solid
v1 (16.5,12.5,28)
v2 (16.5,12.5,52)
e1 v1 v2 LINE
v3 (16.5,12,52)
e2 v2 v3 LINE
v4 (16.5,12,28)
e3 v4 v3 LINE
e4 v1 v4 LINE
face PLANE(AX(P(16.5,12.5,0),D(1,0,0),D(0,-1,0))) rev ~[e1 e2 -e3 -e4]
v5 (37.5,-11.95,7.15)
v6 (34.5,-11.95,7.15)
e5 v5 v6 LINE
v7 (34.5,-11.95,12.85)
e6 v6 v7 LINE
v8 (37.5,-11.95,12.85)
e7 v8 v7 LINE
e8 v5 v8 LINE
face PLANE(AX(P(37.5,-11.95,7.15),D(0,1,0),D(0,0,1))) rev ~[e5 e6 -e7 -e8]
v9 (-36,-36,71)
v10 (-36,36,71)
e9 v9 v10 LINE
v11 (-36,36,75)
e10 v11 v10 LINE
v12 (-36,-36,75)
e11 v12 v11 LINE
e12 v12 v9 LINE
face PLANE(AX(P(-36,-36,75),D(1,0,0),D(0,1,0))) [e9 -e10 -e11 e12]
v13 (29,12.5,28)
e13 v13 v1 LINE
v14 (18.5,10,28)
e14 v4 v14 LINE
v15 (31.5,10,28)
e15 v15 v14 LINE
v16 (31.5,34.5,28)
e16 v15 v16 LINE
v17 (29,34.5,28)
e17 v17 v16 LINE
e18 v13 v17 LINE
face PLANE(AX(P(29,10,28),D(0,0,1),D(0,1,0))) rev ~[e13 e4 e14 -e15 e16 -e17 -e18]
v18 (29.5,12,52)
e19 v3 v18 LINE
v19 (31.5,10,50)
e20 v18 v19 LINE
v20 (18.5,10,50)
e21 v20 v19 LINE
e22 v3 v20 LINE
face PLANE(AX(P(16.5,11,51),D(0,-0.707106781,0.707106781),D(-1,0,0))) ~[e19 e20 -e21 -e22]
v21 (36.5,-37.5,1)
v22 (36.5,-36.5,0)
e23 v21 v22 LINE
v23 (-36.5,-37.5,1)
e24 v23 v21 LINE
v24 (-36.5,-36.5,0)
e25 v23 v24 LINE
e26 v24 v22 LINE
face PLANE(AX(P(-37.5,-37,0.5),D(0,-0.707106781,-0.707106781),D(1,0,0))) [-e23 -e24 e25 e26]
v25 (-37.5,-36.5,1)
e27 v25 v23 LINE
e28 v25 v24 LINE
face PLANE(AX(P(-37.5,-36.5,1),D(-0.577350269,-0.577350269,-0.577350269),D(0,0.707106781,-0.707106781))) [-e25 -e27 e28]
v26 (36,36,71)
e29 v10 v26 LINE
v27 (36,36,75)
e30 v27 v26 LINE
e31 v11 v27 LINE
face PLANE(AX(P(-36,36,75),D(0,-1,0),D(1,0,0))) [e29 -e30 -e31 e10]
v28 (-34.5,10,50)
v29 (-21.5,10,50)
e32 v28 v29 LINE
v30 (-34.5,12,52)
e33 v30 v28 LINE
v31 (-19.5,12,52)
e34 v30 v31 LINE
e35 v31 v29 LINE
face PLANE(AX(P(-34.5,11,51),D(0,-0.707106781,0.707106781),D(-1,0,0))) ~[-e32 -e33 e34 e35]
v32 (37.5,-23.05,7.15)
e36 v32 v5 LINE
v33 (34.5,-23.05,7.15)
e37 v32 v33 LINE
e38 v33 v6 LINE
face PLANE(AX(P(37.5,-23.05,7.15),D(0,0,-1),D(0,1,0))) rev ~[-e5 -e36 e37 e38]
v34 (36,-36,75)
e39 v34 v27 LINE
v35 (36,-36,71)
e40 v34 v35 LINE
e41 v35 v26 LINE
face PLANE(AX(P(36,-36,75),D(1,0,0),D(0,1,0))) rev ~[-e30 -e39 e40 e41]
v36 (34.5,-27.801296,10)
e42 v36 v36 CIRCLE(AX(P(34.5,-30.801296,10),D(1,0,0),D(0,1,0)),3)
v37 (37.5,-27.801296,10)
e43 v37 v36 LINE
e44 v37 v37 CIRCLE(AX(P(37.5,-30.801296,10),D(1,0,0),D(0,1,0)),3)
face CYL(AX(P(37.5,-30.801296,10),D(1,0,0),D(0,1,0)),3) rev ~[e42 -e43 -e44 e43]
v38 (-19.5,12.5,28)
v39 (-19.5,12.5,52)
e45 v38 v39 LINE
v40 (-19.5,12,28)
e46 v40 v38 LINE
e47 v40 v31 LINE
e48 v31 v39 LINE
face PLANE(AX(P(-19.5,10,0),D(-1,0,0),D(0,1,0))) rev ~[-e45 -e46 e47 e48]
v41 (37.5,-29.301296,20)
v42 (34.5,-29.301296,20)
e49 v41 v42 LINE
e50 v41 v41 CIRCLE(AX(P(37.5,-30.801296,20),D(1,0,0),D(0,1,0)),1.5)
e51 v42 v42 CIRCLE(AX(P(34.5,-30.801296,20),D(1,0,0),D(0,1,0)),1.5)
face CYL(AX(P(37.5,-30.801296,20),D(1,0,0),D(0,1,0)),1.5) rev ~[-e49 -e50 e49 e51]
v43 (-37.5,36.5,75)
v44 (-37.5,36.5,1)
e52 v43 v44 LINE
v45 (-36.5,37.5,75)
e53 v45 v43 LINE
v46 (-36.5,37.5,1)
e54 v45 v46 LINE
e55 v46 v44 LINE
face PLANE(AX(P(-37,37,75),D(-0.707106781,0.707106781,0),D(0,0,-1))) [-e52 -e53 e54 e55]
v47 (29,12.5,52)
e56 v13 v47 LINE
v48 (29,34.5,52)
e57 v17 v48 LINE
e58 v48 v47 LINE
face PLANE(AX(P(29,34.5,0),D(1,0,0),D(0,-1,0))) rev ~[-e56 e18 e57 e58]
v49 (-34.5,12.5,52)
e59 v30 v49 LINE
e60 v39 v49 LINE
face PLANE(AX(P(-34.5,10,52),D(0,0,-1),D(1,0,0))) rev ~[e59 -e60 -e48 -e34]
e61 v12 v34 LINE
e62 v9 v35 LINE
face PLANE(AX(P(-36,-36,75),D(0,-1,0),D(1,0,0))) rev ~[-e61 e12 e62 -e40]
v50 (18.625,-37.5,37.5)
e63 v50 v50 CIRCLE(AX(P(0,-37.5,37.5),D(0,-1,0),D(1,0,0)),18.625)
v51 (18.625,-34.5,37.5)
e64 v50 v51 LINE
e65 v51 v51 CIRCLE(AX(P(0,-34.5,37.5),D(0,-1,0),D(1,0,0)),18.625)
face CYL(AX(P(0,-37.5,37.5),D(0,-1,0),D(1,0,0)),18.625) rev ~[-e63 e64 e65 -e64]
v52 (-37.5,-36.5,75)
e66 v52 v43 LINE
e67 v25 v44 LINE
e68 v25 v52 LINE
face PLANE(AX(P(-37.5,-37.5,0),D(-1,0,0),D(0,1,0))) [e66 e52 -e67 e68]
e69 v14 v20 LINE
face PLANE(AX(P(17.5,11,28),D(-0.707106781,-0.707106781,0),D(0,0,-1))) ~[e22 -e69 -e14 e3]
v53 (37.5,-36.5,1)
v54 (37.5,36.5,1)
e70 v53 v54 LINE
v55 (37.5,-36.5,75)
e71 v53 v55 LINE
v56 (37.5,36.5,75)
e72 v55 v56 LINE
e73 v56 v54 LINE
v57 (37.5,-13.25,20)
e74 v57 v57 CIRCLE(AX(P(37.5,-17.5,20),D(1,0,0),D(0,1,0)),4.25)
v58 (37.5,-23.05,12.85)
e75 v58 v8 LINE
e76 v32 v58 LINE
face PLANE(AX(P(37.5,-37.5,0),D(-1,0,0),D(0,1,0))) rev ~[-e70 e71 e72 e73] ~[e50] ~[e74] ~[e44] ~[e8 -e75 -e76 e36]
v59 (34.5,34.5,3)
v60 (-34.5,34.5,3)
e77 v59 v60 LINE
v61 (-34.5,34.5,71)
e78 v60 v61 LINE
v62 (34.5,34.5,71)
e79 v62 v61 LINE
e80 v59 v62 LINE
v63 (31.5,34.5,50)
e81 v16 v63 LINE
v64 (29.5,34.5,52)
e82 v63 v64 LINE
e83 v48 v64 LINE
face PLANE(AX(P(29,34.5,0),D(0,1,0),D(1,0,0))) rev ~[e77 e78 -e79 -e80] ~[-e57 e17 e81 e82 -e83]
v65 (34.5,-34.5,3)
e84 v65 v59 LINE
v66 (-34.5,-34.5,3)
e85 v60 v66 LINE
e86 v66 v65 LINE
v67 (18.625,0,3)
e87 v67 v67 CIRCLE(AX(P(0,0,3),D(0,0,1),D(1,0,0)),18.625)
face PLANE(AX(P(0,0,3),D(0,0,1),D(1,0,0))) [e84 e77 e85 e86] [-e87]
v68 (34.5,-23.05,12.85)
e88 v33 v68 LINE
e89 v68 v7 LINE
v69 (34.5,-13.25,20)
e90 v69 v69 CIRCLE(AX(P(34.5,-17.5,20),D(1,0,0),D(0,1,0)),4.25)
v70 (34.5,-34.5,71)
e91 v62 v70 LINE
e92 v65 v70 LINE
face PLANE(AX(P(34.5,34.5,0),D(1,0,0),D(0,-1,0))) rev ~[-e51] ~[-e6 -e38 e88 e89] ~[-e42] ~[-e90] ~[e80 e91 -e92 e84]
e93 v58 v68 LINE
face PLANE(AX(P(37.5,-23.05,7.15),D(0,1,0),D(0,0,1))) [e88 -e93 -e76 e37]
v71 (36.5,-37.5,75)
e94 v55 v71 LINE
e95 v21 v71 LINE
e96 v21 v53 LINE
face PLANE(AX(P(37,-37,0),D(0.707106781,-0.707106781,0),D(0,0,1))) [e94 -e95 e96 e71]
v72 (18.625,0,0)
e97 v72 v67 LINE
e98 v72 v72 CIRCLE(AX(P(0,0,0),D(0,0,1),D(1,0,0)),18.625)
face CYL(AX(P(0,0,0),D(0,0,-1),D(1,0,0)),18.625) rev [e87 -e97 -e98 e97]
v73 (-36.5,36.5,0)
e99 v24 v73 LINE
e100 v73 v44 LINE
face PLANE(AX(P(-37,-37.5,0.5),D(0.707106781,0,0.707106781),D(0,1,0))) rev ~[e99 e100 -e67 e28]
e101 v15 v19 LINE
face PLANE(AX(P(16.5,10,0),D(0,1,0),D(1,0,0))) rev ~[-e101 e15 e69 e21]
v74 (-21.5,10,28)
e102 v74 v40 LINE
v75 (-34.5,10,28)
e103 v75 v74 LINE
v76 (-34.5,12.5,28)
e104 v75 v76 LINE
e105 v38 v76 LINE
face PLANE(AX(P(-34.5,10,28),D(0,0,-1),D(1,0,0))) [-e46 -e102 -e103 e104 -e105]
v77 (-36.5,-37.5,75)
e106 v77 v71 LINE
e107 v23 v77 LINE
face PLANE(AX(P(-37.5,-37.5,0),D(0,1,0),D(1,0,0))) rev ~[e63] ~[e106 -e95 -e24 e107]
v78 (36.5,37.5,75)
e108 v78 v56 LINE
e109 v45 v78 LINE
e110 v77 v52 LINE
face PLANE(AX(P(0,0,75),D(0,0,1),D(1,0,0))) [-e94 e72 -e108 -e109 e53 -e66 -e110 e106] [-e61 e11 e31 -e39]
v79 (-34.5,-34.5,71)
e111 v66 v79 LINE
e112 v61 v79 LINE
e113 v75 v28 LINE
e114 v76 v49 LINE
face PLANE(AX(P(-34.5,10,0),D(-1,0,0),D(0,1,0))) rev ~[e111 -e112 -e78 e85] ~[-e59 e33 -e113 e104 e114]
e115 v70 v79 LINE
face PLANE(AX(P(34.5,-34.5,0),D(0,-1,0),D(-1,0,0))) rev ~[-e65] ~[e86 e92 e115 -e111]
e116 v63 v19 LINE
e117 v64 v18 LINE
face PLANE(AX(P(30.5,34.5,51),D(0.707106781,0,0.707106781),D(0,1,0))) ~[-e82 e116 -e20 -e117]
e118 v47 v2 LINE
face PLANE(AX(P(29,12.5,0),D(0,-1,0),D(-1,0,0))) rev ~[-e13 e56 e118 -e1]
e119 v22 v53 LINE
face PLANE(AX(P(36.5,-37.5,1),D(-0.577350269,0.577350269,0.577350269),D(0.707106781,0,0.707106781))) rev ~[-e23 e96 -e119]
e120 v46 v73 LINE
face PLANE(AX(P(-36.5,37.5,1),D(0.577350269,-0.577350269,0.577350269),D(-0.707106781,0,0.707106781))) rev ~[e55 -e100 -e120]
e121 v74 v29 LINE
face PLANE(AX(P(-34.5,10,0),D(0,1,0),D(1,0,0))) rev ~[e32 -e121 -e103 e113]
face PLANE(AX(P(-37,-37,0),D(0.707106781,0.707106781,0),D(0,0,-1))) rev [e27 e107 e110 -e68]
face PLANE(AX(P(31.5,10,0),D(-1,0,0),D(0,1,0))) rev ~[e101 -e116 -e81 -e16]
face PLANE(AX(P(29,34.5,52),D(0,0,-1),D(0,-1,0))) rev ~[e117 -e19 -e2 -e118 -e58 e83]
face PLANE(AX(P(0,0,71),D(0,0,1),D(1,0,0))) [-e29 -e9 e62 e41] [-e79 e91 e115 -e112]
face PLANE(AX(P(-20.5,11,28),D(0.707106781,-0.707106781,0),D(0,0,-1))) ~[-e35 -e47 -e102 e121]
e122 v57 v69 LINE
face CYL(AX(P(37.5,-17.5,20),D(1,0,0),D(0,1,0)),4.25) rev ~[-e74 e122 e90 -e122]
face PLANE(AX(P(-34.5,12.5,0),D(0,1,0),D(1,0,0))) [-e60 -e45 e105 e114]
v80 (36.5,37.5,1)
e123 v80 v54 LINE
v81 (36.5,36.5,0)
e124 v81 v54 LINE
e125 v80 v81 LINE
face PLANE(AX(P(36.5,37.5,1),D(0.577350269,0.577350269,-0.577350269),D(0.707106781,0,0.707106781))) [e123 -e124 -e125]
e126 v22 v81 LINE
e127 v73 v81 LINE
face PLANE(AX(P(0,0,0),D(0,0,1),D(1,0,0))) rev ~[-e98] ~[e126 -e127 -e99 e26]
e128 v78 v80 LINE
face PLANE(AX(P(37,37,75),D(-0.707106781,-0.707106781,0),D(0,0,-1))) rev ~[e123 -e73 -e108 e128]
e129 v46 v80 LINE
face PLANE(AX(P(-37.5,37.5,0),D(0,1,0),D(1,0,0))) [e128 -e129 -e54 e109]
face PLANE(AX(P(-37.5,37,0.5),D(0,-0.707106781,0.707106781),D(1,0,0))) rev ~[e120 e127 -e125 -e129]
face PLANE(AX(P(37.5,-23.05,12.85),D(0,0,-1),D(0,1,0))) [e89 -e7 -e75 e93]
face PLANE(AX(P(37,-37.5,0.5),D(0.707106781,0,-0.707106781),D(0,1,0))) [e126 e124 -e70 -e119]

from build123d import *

# Parameters (mm, degrees)
F0_W           = 75
F0_H           = 75
F0_R           = 18.625
F1_DEPTH       = 3
F2_DEPTH       = 75
F3_R           = 18.625
F4_DEPTH       = 10.2
F0_W_2         = 15
F0_H_2         = 2.5
F5_DEPTH       = 77
F6_W           = 72
F6_H           = 72
F7_DEPTH       = 4
F8_SIZE        = 1
F10_W          = 12.5
F10_H          = 25
F11_DEPTH      = 25
F9_W           = 15
F9_H           = 25
F12_DEPTH      = 14.8
F14_DEPTH      = 3.8
F15_R          = 1.5
F15_R_2        = 4.25
F15_W          = 11.1
F15_H          = 5.7
F15_R_3        = 3
F16_DEPTH      = 25
F16_DEPTH_BACK = 25
F17_SIZE2      = 2
F17_SIZE       = 2


# Not quite as in the source:
# - a feature names something its author has since deleted; it is built from what else it names


with BuildPart() as f1:
    # F0 (on Top) → F1 (new body)
    with BuildSketch(Plane.XY):
        Rectangle(F0_W, F0_H)
        Polygon((-34.5, 12.5), (-34.5, 34.5), (29, 34.5), (31.5, 34.5), (34.5, 34.5), (34.5, -34.5), (-34.5, -34.5), (-34.5, 10), align=None, mode=Mode.SUBTRACT)
        Polygon((29, 34.5), (-34.5, 34.5), (-34.5, 12.5), (-19.5, 12.5), (-19.5, 10), (-34.5, 10), (-34.5, -34.5), (34.5, -34.5), (34.5, 34.5), (31.5, 34.5), (31.5, 10), (16.5, 10), (16.5, 12.5), (29, 12.5), align=None)
        Circle(F0_R, mode=Mode.SUBTRACT)
    extrude(amount=F1_DEPTH)

    # F0 (on Top) → F2 (join)
    with BuildSketch(Plane.XY):
        Rectangle(F0_W, F0_H)
        Polygon((-34.5, 12.5), (-34.5, 34.5), (29, 34.5), (31.5, 34.5), (34.5, 34.5), (34.5, -34.5), (-34.5, -34.5), (-34.5, 10), align=None, mode=Mode.SUBTRACT)
    extrude(amount=F2_DEPTH)

    # F3 (on face) → F4 (cut)
    with BuildSketch(Plane.XZ.offset(37.5)):
        with Locations((0, 37.5)):
            Circle(F3_R)
    extrude(amount=-F4_DEPTH, mode=Mode.SUBTRACT)

    # F0 (on Top) → F5 (join)
    with BuildSketch(Plane.XY):
        with Locations((-27, 11.25)):
            Rectangle(F0_W_2, F0_H_2)
        Polygon((31.5, 34.5), (29, 34.5), (29, 12.5), (16.5, 12.5), (16.5, 10), (31.5, 10), align=None)
    extrude(amount=F5_DEPTH)

    # F6 (on face) → F7 (cut)
    with BuildSketch(Plane.XY.offset(75)):
        Rectangle(F6_W, F6_H)
        Polygon((-34.5, 10), (-34.5, 12.5), (-34.5, 34.5), (29, 34.5), (31.5, 34.5), (34.5, 34.5), (34.5, -34.5), (-34.5, -34.5), align=None, mode=Mode.SUBTRACT)
    extrude(amount=-F7_DEPTH, mode=Mode.SUBTRACT)

    # F8
    f8_edges = [f1.edges().sort_by_distance(p)[0] for p in [
        (37.5, 0, 0),
        (0, -37.5, 0),
        (-37.5, -37.5, 37.5),
        (37.5, -37.5, 37.5),
        (-37.5, 0, 0),
        (0, 37.5, 0),
        (37.5, 37.5, 37.5),
        (-37.5, 37.5, 37.5),
    ]]
    chamfer(f8_edges, length=F8_SIZE)

    # F10 (on face) → F11 (cut)
    with BuildSketch(Plane(origin=(0, 12.5, 0), x_dir=(-1, 0, 0), z_dir=(0, 1, 0))):
        with Locations((-22.75, 64.5)):
            Rectangle(F10_W, F10_H)
        with Locations((-22.75, 15.5)):
            Rectangle(F10_W, F10_H)
    extrude(amount=-F11_DEPTH, mode=Mode.SUBTRACT)

    # F9 (on face) → F12 (cut)
    with BuildSketch(Plane.XZ.offset(-10)):
        Polygon((-19.5, 77), (-34.5, 77), (-34.5, 71), (-34.5, 52), (-19.5, 52), align=None)
        with Locations((-27, 15.5)):
            Rectangle(F9_W, F9_H)
    extrude(amount=-F12_DEPTH, mode=Mode.SUBTRACT)

    # F13 (on face) → F14 (cut)
    with BuildSketch(Plane(origin=(29, 0, 0), x_dir=(0, -1, 0), z_dir=(-1, 0, 0))):
        Polygon((-12.5, 52), (-10, 52), (-10, 77), (-34.5, 77), (-34.5, 71), (-34.5, 52), align=None)
        Polygon((-10, 28), (-12.5, 28), (-34.5, 28), (-34.5, 3), (-10, 3), align=None)
    extrude(amount=-F14_DEPTH, mode=Mode.SUBTRACT)

    # F15 (on face) → F16 (cut, two sides)
    with BuildSketch(Plane.YZ.offset(37.5)) as f16_sk:
        with Locations((-30.8012962341, 20)):
            Circle(F15_R)
        with Locations((-17.5, 20)):
            Circle(F15_R_2)
        with Locations((-17.5, 10)):
            Rectangle(F15_W, F15_H)
        with Locations((-30.8012962341, 10)):
            Circle(F15_R_3)
    extrude(amount=-F16_DEPTH, mode=Mode.SUBTRACT)
    extrude(f16_sk.sketch, amount=F16_DEPTH_BACK, mode=Mode.SUBTRACT)

    # F17
    f17_edges = [f1.edges().sort_by_distance(p)[0] for p in [
        (16.5, 10, 40),
        (24, 10, 52),
        (-27, 10, 52),
        (-19.5, 10, 40),
        (31.5, 22.25, 52),
    ]]
    chamfer(f17_edges, length=F17_SIZE, length2=F17_SIZE2)


solid = f1.part
